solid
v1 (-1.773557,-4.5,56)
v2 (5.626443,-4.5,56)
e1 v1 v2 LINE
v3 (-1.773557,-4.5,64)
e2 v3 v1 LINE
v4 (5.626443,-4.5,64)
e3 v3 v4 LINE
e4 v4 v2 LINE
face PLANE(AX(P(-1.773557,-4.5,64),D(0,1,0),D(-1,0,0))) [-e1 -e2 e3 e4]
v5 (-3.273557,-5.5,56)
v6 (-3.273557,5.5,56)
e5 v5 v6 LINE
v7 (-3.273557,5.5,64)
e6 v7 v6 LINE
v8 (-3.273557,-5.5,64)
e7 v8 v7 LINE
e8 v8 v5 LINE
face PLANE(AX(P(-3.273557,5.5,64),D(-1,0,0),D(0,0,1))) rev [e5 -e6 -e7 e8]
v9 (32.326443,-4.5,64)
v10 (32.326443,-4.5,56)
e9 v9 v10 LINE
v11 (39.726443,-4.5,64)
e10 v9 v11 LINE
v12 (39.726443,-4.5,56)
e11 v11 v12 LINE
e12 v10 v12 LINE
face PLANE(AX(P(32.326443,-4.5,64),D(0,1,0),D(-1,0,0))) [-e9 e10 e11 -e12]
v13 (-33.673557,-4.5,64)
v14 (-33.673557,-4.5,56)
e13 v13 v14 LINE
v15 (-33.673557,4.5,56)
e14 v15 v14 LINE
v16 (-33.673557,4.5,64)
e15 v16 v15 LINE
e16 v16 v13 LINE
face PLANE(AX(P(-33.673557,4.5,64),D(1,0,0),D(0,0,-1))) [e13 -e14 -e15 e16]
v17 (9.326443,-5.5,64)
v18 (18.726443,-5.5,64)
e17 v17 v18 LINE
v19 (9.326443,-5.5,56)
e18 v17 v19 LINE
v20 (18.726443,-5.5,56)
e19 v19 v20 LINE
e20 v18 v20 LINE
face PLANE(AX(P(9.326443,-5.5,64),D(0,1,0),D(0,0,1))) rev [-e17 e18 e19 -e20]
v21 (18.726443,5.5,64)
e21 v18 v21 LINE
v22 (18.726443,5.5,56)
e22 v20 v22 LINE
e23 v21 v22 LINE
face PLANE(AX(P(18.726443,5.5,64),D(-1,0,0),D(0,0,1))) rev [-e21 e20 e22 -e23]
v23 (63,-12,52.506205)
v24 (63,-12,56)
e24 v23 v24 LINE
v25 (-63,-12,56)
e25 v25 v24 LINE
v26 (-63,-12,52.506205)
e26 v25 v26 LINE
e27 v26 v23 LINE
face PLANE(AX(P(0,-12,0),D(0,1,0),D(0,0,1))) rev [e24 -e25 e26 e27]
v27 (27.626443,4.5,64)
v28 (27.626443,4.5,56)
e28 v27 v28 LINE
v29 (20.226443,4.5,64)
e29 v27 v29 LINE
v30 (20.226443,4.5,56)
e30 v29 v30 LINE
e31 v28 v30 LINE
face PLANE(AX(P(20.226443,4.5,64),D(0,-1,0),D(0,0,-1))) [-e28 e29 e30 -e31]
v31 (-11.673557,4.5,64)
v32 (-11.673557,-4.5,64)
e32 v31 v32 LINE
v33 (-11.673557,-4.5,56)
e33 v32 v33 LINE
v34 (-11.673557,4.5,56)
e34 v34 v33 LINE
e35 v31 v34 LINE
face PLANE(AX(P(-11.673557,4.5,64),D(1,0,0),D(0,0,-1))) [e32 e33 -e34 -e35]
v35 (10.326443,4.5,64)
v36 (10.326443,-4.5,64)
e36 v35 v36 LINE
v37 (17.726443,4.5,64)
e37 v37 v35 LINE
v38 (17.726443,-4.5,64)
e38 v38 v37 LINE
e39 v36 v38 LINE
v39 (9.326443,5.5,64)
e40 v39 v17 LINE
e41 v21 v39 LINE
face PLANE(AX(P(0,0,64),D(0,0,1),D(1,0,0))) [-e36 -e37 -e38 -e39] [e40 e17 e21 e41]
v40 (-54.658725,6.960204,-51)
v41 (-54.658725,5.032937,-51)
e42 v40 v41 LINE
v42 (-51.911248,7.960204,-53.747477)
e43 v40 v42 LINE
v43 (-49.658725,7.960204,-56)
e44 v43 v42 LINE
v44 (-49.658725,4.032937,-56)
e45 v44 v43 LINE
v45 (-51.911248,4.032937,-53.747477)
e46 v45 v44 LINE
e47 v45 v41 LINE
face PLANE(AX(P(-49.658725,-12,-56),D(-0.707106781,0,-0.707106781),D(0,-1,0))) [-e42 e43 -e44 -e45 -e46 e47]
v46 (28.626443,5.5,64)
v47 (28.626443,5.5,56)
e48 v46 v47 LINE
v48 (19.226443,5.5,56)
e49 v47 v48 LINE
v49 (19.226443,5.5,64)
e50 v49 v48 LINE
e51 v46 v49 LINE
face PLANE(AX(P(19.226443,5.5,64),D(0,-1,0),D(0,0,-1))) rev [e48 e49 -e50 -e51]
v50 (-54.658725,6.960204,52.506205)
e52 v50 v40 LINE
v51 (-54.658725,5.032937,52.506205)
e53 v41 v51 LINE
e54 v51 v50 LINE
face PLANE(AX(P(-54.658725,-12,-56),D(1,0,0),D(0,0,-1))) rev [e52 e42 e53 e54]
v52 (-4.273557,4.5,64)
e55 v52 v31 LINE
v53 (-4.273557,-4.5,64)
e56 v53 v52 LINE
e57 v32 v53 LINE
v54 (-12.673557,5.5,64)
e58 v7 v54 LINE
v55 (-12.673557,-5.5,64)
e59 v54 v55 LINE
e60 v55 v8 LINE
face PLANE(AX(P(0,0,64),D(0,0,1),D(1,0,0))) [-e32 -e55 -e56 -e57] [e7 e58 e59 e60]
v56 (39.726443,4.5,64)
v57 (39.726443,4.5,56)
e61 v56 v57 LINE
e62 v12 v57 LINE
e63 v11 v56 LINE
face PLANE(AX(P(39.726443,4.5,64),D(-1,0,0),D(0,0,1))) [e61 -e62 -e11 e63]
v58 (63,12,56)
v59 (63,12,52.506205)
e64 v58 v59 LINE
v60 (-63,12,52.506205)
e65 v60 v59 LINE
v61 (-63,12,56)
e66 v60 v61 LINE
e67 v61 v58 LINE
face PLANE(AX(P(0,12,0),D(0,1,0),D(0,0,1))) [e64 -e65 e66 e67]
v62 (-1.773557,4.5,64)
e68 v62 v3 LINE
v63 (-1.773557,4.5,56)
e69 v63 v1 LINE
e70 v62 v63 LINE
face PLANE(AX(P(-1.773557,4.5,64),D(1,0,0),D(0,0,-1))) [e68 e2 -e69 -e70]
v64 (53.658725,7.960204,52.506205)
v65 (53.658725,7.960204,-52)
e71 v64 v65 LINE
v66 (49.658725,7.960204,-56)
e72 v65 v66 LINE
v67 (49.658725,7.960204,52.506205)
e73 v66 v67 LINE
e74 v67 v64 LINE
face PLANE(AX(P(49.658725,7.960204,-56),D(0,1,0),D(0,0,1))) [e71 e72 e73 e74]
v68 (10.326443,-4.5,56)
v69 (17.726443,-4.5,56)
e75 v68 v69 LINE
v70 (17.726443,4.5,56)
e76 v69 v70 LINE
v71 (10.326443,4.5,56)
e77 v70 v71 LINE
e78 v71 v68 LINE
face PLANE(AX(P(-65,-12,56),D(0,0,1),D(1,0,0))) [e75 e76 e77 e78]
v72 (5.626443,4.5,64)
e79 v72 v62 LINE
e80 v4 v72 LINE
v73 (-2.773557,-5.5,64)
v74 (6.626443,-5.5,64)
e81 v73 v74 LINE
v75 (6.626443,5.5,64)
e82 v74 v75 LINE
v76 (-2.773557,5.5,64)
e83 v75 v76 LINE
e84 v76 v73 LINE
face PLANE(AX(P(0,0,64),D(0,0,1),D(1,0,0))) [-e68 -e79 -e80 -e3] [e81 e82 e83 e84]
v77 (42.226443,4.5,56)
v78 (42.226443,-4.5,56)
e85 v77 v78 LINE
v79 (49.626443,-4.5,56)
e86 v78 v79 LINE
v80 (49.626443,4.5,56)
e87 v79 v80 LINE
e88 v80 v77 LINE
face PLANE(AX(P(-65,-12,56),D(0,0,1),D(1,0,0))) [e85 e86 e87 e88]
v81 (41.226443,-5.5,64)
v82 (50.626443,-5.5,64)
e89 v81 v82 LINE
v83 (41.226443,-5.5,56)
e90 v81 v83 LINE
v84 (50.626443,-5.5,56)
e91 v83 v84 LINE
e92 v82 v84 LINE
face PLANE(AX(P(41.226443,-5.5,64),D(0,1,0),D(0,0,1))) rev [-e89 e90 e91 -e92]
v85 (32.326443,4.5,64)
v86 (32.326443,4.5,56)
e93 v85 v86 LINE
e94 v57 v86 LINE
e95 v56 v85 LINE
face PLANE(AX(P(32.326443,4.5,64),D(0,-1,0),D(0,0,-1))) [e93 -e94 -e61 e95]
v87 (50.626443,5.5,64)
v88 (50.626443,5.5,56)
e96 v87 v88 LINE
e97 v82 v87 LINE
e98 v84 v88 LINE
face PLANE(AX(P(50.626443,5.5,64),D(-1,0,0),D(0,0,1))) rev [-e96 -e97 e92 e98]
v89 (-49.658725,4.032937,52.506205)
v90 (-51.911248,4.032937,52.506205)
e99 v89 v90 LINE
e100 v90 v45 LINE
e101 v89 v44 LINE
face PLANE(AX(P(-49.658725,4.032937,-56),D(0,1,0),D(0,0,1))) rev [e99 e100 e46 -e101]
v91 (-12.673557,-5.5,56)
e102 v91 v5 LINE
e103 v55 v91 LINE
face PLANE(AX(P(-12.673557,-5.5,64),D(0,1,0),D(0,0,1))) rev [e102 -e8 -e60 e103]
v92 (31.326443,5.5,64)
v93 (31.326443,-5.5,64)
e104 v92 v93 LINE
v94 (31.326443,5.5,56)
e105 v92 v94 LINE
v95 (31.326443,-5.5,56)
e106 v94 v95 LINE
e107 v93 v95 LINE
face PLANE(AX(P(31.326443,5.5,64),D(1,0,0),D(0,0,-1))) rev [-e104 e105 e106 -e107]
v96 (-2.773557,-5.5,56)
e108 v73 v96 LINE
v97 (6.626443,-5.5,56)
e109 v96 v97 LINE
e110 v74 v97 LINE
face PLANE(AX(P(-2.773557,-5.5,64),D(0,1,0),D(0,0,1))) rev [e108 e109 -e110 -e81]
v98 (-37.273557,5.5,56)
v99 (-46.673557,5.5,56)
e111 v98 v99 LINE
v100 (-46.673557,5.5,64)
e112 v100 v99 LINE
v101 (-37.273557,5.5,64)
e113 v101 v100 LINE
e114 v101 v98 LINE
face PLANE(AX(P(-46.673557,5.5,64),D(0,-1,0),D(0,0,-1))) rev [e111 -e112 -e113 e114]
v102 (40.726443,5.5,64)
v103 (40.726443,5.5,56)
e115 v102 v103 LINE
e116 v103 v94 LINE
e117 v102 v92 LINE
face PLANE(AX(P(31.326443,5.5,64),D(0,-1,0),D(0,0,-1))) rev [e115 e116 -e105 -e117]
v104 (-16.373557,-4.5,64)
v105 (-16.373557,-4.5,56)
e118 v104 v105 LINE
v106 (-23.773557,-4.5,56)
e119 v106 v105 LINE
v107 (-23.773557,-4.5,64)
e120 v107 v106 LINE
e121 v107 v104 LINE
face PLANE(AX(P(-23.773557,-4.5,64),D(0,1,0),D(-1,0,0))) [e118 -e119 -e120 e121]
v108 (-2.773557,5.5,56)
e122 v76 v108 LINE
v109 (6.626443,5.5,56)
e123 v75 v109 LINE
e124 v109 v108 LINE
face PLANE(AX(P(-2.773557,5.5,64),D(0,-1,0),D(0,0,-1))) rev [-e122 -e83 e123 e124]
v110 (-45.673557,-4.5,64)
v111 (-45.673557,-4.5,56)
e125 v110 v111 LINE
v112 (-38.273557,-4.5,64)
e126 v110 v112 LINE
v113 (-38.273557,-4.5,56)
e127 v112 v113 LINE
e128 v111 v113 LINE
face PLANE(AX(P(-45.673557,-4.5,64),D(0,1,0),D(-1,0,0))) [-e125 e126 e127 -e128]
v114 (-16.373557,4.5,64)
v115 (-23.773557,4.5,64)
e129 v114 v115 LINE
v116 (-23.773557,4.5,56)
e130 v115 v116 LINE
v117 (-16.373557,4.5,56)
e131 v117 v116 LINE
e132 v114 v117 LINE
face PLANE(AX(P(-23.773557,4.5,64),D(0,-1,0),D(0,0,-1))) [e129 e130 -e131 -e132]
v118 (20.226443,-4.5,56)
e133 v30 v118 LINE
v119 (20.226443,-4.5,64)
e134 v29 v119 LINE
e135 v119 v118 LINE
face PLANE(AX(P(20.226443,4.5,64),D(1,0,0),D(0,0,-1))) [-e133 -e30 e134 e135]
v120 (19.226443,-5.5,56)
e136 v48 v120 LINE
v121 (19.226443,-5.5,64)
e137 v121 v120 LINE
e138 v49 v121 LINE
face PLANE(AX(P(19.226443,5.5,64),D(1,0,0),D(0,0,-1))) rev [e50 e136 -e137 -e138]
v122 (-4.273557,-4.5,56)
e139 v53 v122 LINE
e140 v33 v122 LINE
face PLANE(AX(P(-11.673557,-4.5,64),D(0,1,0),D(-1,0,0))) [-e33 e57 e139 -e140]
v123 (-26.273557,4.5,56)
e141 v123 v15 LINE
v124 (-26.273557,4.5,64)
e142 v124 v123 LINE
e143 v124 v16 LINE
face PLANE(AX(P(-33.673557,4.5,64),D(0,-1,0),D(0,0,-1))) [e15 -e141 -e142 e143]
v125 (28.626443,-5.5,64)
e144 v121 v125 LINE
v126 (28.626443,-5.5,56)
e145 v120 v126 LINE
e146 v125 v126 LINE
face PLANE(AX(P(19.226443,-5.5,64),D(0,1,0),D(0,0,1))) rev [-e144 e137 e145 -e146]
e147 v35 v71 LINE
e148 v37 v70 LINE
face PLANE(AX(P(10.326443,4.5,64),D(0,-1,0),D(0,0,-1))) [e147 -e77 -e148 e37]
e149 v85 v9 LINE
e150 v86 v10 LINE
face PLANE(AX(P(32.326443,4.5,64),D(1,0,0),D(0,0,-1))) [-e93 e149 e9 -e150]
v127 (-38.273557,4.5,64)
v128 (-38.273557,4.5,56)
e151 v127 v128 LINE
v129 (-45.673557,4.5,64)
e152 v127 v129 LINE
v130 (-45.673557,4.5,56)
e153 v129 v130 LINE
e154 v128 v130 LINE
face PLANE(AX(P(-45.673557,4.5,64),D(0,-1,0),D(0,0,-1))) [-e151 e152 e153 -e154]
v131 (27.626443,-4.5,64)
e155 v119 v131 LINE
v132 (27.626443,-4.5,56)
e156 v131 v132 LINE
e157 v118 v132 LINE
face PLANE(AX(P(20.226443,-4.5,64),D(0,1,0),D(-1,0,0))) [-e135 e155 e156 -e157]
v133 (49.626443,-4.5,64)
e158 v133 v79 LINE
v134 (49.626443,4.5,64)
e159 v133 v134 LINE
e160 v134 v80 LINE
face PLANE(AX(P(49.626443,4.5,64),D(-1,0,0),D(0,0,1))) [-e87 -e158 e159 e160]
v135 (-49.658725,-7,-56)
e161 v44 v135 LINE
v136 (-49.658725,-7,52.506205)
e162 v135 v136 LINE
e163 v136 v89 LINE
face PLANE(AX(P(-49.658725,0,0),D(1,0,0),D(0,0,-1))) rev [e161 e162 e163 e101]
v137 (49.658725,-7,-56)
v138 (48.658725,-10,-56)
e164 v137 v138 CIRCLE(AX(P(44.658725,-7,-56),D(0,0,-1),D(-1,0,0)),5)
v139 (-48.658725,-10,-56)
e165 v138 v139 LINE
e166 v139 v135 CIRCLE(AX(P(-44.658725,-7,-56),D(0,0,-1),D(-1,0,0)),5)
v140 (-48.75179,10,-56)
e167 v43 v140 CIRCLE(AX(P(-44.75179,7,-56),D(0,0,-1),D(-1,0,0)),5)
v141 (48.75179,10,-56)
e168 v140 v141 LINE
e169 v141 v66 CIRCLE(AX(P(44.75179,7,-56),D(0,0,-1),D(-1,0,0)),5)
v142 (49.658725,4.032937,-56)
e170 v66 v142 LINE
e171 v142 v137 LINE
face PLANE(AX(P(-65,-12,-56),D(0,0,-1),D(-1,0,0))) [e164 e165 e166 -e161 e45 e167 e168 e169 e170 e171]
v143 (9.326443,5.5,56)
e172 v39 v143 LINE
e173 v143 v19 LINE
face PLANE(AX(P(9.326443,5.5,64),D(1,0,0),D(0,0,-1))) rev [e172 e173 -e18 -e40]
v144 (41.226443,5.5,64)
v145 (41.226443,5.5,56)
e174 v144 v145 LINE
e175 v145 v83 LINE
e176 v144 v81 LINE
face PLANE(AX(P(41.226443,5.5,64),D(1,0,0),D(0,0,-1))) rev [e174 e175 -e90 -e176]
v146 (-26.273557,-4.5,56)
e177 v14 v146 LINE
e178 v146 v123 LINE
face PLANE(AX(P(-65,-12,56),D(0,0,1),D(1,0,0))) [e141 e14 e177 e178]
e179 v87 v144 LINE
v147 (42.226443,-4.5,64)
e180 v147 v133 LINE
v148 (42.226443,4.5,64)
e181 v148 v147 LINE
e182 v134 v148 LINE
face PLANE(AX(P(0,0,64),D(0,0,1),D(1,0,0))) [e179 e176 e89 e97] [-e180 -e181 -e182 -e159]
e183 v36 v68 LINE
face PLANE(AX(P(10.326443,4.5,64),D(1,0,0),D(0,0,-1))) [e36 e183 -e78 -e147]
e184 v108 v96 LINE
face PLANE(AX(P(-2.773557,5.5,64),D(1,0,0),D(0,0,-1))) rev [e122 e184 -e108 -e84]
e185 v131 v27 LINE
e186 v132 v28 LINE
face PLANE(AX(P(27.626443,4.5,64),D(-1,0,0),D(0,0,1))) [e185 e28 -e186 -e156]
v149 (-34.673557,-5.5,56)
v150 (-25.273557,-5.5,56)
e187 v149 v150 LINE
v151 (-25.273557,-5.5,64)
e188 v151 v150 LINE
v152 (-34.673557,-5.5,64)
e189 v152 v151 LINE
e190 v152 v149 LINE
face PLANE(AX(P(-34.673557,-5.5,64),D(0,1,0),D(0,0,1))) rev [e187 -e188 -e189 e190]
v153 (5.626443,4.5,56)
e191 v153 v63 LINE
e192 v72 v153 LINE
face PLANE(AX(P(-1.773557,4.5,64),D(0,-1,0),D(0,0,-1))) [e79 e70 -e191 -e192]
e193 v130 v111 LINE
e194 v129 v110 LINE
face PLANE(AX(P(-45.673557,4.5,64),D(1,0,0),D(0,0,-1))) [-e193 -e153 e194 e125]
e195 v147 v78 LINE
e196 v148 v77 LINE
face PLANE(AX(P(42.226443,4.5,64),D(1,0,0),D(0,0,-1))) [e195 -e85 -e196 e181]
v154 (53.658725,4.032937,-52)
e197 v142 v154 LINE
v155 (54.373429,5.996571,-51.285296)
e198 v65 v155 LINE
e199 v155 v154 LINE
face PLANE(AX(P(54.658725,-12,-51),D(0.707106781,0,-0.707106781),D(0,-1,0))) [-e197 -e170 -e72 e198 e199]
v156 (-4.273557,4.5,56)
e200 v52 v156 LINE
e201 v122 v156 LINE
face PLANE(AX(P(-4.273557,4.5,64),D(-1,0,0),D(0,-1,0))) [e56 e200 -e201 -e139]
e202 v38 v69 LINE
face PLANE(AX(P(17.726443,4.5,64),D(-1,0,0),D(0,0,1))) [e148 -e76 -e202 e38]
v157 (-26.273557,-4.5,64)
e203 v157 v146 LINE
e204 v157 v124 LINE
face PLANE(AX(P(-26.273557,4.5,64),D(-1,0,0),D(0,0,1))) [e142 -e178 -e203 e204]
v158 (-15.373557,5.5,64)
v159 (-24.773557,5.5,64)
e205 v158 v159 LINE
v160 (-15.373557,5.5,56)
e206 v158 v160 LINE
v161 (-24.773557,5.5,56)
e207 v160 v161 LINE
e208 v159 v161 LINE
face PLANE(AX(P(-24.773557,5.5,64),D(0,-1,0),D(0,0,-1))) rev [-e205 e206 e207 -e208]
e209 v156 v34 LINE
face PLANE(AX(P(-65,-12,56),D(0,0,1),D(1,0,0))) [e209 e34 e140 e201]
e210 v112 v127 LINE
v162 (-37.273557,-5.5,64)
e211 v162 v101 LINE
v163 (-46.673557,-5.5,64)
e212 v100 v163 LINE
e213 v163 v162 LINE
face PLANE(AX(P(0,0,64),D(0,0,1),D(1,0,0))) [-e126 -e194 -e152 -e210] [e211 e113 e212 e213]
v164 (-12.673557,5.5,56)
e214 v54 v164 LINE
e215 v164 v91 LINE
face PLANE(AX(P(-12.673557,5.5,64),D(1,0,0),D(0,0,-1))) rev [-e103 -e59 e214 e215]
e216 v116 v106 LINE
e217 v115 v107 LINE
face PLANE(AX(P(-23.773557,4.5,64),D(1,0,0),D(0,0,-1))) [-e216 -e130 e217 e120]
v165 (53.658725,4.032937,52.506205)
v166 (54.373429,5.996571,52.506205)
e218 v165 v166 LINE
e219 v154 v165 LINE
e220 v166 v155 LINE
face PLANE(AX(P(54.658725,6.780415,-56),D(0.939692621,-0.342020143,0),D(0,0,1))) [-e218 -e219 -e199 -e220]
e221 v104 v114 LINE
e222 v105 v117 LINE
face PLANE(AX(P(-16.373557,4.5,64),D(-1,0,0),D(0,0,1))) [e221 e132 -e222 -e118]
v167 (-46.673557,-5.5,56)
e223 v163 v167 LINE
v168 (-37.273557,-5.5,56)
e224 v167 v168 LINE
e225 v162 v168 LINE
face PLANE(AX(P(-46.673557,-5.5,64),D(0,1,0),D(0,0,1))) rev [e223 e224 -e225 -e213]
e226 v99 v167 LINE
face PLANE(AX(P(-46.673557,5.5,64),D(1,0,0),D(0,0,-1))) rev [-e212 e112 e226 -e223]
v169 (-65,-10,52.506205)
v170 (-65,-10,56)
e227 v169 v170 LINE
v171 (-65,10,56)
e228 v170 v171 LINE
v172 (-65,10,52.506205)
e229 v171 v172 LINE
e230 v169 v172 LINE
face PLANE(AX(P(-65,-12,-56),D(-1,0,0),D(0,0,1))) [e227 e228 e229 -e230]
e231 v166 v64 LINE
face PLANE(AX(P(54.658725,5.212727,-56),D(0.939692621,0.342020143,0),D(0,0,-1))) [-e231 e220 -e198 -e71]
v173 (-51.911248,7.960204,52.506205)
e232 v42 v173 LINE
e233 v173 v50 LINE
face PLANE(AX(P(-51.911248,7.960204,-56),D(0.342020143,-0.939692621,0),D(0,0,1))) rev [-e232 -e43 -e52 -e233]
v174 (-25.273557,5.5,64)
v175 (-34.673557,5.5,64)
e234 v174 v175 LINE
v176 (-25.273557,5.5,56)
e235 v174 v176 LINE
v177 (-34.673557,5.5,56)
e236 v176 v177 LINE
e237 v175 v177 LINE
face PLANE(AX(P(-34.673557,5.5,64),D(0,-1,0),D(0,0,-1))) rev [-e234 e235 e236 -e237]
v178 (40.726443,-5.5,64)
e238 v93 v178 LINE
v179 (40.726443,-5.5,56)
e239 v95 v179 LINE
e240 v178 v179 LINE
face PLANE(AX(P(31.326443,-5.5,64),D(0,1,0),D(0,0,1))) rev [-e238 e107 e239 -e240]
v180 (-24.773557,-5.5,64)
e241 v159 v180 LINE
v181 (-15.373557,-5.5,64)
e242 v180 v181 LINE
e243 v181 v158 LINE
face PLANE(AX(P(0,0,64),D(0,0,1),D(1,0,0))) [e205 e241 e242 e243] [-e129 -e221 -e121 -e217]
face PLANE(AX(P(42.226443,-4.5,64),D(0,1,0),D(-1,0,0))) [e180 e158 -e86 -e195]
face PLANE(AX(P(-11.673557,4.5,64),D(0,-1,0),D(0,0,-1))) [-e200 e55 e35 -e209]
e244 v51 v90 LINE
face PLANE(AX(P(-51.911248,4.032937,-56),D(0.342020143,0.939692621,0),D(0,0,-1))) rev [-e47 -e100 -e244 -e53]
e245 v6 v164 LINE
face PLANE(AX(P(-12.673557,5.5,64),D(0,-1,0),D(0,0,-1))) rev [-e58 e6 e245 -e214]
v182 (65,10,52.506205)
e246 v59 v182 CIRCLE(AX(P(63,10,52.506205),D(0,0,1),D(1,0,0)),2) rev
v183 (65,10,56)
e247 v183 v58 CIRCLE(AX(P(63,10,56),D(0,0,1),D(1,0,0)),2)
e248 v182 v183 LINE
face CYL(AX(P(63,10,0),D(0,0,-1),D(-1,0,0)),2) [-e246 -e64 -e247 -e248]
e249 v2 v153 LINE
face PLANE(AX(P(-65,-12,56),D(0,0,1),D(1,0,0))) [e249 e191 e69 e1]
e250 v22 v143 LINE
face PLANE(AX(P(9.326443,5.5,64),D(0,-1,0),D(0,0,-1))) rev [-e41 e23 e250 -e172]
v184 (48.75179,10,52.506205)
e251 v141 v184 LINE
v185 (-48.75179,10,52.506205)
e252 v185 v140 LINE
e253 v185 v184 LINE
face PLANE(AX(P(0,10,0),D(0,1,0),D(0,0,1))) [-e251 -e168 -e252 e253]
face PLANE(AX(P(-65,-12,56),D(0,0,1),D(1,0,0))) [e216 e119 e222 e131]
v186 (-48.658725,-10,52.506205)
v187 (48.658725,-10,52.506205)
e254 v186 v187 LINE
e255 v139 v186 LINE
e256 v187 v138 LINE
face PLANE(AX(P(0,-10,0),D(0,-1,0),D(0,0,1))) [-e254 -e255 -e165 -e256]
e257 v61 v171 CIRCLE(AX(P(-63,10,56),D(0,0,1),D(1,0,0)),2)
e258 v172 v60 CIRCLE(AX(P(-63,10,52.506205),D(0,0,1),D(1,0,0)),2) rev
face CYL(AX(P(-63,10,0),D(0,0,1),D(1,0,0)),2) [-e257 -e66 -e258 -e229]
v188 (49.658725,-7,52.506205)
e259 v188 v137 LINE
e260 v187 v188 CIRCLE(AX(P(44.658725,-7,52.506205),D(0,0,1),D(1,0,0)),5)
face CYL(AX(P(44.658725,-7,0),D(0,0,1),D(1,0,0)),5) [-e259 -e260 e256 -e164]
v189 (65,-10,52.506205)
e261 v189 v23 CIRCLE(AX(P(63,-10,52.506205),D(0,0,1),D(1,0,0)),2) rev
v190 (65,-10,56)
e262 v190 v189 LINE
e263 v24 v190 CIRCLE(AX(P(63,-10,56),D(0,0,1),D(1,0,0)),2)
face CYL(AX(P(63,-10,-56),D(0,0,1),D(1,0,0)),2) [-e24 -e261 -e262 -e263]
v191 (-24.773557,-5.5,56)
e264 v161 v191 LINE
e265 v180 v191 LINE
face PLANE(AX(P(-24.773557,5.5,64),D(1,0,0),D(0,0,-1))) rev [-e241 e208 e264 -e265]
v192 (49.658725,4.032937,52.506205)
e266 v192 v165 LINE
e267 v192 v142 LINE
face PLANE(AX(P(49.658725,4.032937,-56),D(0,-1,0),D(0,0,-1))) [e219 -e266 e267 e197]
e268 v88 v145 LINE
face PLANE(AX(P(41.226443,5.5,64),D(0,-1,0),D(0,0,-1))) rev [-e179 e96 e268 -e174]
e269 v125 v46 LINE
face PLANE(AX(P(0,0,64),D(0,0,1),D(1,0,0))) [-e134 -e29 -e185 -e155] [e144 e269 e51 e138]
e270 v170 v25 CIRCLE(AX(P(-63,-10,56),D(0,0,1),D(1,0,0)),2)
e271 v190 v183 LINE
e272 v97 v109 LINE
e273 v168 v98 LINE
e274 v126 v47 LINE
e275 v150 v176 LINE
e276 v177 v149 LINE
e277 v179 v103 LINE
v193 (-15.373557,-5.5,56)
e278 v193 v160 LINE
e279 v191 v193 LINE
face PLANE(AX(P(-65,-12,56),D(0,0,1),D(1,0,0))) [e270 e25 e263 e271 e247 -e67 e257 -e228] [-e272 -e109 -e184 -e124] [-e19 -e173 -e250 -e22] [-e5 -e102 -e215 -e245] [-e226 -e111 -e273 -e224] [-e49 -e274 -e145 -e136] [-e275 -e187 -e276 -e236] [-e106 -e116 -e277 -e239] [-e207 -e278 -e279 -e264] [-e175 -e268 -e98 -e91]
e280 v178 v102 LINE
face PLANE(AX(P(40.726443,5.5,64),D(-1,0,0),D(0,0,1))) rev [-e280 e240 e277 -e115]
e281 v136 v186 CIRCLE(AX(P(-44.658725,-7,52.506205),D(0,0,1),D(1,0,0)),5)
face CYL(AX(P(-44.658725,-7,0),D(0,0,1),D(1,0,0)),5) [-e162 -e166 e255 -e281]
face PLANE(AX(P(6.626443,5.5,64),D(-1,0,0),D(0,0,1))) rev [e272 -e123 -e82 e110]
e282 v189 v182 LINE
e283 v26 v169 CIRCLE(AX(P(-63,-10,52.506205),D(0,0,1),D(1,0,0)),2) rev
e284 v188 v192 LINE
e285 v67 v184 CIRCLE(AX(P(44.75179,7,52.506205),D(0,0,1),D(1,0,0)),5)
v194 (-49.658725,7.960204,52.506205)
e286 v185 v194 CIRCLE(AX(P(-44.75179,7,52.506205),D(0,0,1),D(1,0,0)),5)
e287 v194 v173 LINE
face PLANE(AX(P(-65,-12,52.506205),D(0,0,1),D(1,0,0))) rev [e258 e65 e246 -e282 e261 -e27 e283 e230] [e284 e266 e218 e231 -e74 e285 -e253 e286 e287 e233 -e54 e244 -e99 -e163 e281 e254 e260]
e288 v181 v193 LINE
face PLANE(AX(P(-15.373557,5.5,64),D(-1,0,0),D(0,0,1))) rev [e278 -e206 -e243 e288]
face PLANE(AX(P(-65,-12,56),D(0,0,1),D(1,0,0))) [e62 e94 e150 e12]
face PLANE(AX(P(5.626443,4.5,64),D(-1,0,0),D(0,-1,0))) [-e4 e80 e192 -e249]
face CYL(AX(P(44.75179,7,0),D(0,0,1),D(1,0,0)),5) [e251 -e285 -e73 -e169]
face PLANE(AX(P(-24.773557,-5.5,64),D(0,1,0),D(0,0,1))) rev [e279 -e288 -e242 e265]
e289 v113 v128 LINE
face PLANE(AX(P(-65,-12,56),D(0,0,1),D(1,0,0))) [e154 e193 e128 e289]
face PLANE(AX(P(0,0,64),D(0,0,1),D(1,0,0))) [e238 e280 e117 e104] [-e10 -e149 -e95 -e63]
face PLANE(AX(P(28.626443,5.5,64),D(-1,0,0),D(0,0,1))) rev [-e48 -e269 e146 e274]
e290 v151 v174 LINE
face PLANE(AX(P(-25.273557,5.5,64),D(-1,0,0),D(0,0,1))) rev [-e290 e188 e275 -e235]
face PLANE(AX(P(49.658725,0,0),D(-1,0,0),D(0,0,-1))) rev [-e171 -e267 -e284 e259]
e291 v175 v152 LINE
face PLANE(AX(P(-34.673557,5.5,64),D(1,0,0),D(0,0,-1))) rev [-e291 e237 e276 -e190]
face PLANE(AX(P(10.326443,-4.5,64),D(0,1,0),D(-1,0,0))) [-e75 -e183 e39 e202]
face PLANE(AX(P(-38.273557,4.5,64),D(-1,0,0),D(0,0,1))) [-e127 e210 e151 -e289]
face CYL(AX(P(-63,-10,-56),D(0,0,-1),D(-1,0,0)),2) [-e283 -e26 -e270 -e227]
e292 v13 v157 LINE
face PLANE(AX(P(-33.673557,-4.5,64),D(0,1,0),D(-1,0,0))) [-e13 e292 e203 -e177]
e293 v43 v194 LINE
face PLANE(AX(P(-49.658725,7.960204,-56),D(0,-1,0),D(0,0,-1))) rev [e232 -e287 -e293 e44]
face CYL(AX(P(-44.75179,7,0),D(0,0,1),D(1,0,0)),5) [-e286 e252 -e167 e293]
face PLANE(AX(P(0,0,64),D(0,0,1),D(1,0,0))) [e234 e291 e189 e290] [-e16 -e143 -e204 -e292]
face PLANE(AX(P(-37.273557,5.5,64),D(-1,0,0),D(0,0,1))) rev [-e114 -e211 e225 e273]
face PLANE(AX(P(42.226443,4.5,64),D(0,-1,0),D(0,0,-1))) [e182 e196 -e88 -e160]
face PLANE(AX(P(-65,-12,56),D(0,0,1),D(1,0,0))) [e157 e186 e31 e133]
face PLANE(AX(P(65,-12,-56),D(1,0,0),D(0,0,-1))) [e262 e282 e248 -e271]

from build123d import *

# Parameters (mm, degrees)
EXTRUDE_1_DEPTH      = 12
EXTRUDE_1_DEPTH_BACK = 12
SKETCH_1_W           = 130
SKETCH_1_H           = 112
SKETCH_2_W           = 10.341275007
SKETCH_2_H           = 108.506204724
CUT_EXTRUDE_1_DEPTH  = 90.089842294
SKETCH_3_W           = 108.506204724
SKETCH_3_H           = 4.039795579
SKETCH_3_H_2         = 16.032937215
CUT_EXTRUDE_2_DEPTH  = 5
CHAMFER_1_SIZE       = 5
FILLET_1_R           = 5
CHAMFER_2_SIZE       = 2.747477419
CHAMFER_2_SIZE_2     = 1
FILLET_2_R           = 2
SKETCH_4_W           = 9.4
SKETCH_4_H           = 11
SKETCH_4_W_2         = 7.4
SKETCH_4_H_2         = 9
EXTRUDE_2_DEPTH      = 8
SKETCH_5_W           = 122.805441914
SKETCH_5_H           = 111.758877205
CUT_EXTRUDE_3_DEPTH  = 2


with BuildPart() as part:
    # 草图1 → 凸台-拉伸1 (new, two sides: drawn at the far end of the back side and taken through both)
    with BuildSketch(Plane(origin=(0, 0, 0), x_dir=(1, 0, 0), z_dir=(0, 1, 0)).offset(-EXTRUDE_1_DEPTH_BACK)):
        Rectangle(SKETCH_1_W, SKETCH_1_H)
    extrude(amount=EXTRUDE_1_DEPTH + EXTRUDE_1_DEPTH_BACK)

    # 草图2 → 切除-拉伸1 (cut, through all)
    with BuildSketch(Plane(origin=(0, 12, 0), x_dir=(1, 0, 0), z_dir=(0, 1, 0))):
        with Locations((59.829362496, 1.746897638)):
            Rectangle(SKETCH_2_W, SKETCH_2_H)
        with Locations((-59.829362496, 1.746897638)):
            Rectangle(SKETCH_2_W, SKETCH_2_H)
    extrude(amount=-CUT_EXTRUDE_1_DEPTH, mode=Mode.SUBTRACT)

    # 草图3 → 切除-拉伸2 (cut)
    with BuildSketch(Plane.ZY.offset(54.658724993)):
        with Locations((-1.746897638, 9.980102211)):
            Rectangle(SKETCH_3_W, SKETCH_3_H)
        with Locations((-1.746897638, -3.983531392)):
            Rectangle(SKETCH_3_W, SKETCH_3_H_2)
    cut_extrude_2 = extrude(amount=-CUT_EXTRUDE_2_DEPTH, mode=Mode.SUBTRACT)

    # 镜向1: 切除-拉伸2 across plane
    add(cut_extrude_2.mirror(Plane(origin=(0, 0, 0), x_dir=(0, 0, 1), z_dir=(1, 0, 0))), mode=Mode.SUBTRACT)

    # 倒角1
    chamfer_1_edges = [part.edges().sort_by_distance(p)[0] for p in [
        (-54.658724993, 5.996570818, -56),
        (54.658724993, 5.996570818, -56),
    ]]
    chamfer(chamfer_1_edges, length=CHAMFER_1_SIZE)

    # 圆角1
    # the kernel refuses this fillet: 5 mm, written as the material it takes off along each edge
    with BuildSketch(Plane(origin=(-49.658724993, 12, -68.267336577), x_dir=(0, -1, 0), z_dir=(0, 0, 1))) as fillet_1_piece_1:
        with BuildLine():
            CenterArc((5, 4.906934631), FILLET_1_R, 180, 78.928088112)
            Line((0, 4.906934631), (0, 0))
            Line((0, 0), (4.039795579, 0))
        make_face()
    extrude(amount=120.773541301, mode=Mode.SUBTRACT)
    with BuildSketch(Plane(origin=(-49.658724993, -12, -68.5), x_dir=(0, 1, 0), z_dir=(0, 0, 1)), Plane(origin=(49.658724993, -12, -68.5), x_dir=(-1, 0, 0), z_dir=(0, 0, 1))) as fillet_1_piece_2:
        with BuildLine():
            CenterArc((FILLET_1_R, -FILLET_1_R), FILLET_1_R, 90, 90)
            Line((0, -FILLET_1_R), (0, 0))
            Line((0, 0), (FILLET_1_R, 0))
        make_face()
    extrude(amount=121.006204724, mode=Mode.SUBTRACT)
    with BuildSketch(Plane(origin=(49.658724993, 12, -68.267336577), x_dir=(-1, 0, 0), z_dir=(0, 0, 1))) as fillet_1_piece_3:
        with BuildLine():
            CenterArc((4.906934631, 5), FILLET_1_R, 191.071911888, 78.928088112)
            Line((0, 4.039795579), (0, 0))
            Line((0, 0), (4.906934631, 0))
        make_face()
    extrude(amount=120.773541301, mode=Mode.SUBTRACT)

    # 倒角2
    # the kernel refuses this chamfer: 2.747477419, 1 mm, written as the material it takes off along each edge
    with BuildSketch(Plane(origin=(54.658724993, 7.960204421, 52.506204724), x_dir=(0.013184058198646324, -0.9999130865277316, 0), z_dir=(0, 0, -1))) as chamfer_2_piece_1:
        Polygon((CHAMFER_2_SIZE * 0.999913086693, CHAMFER_2_SIZE * 0.0131840582008), (-CHAMFER_2_SIZE_2 * 0.0131840581986, CHAMFER_2_SIZE_2 * 0.999913086528), (0, 0), align=None)
    extrude(amount=110.633696174, mode=Mode.SUBTRACT)
    with BuildSketch(Plane(origin=(54.658724993, 4.032937215, 52.506204724), x_dir=(-0.9950833631817486, -0.09904090225205064, 0), z_dir=(0, 0, -1))) as chamfer_2_piece_2:
        Polygon((CHAMFER_2_SIZE_2 * 0.995083363182, CHAMFER_2_SIZE_2 * 0.0990409022521), (-CHAMFER_2_SIZE * 0.0990409022684, CHAMFER_2_SIZE * 0.995083363346), (0, 0), align=None)
    extrude(amount=110.633696174, mode=Mode.SUBTRACT)
    with BuildSketch(Plane(origin=(-54.658724993, 4.032937215, 52.506204724), x_dir=(0.9999130865277316, -0.013184058198645857, 0), z_dir=(0, 0, -1))) as chamfer_2_piece_3:
        Polygon((CHAMFER_2_SIZE * 0.999913086693, -CHAMFER_2_SIZE * 0.0131840582008), (-CHAMFER_2_SIZE_2 * 0.0131840581986, -CHAMFER_2_SIZE_2 * 0.999913086528), (0, 0), align=None)
    extrude(amount=110.633696174, mode=Mode.SUBTRACT)
    with BuildSketch(Plane(origin=(-54.658724993, 7.960204421, 52.506204724), x_dir=(-0.09904090225204956, -0.9950833631817488, 0), z_dir=(0, 0, -1))) as chamfer_2_piece_4:
        Polygon((CHAMFER_2_SIZE_2 * 0.995083363182, -CHAMFER_2_SIZE_2 * 0.099040902252), (-CHAMFER_2_SIZE * 0.0990409022684, -CHAMFER_2_SIZE * 0.995083363346), (0, 0), align=None)
    extrude(amount=110.633696174, mode=Mode.SUBTRACT)

    # 圆角2
    fillet_2_edges = [part.edges().sort_by_distance(p)[0] for p in [
        (65, -12, 54.253102362),
        (65, 12, 54.253102362),
        (-65, 12, 54.253102362),
        (-65, -12, 54.253102362),
    ]]
    fillet(fillet_2_edges, radius=FILLET_2_R)

    # 草图4 → 凸台-拉伸2 (add)
    # profile 1 of 9: a face of its own
    with BuildSketch(Plane.XY.offset(56)):
        with Locations((-29.973556768, 0)):
            Rectangle(SKETCH_4_W, SKETCH_4_H)
        with Locations((-29.973556768, 0)):
            Rectangle(SKETCH_4_W_2, SKETCH_4_H_2, mode=Mode.SUBTRACT)
    # profile 2 of 9: a face of its own
    with BuildSketch(Plane.XY.offset(56)):
        with Locations((-41.973556768, 0)):
            Rectangle(SKETCH_4_W, SKETCH_4_H)
        with Locations((-41.973556768, 0)):
            Rectangle(SKETCH_4_W_2, SKETCH_4_H_2, mode=Mode.SUBTRACT)
    # profile 3 of 9: a face of its own
    with BuildSketch(Plane.XY.offset(56)):
        with Locations((-20.073556768, 0)):
            Rectangle(SKETCH_4_W, SKETCH_4_H)
        with Locations((-20.073556768, 0)):
            Rectangle(SKETCH_4_W_2, SKETCH_4_H_2, mode=Mode.SUBTRACT)
    # profile 4 of 9: a face of its own
    with BuildSketch(Plane.XY.offset(56)):
        with Locations((-7.973556768, 0)):
            Rectangle(SKETCH_4_W, SKETCH_4_H)
        with Locations((-7.973556768, 0)):
            Rectangle(SKETCH_4_W_2, SKETCH_4_H_2, mode=Mode.SUBTRACT)
    # profile 5 of 9: a face of its own
    with BuildSketch(Plane.XY.offset(56)):
        with Locations((1.926443232, 0)):
            Rectangle(SKETCH_4_W, SKETCH_4_H)
        with Locations((1.926443232, 0)):
            Rectangle(SKETCH_4_W_2, SKETCH_4_H_2, mode=Mode.SUBTRACT)
    # profile 6 of 9: a face of its own
    with BuildSketch(Plane.XY.offset(56)):
        with Locations((14.026443232, 0)):
            Rectangle(SKETCH_4_W, SKETCH_4_H)
        with Locations((14.026443232, 0)):
            Rectangle(SKETCH_4_W_2, SKETCH_4_H_2, mode=Mode.SUBTRACT)
    # profile 7 of 9: a face of its own
    with BuildSketch(Plane.XY.offset(56)):
        with Locations((23.926443232, 0)):
            Rectangle(SKETCH_4_W, SKETCH_4_H)
        with Locations((23.926443232, 0)):
            Rectangle(SKETCH_4_W_2, SKETCH_4_H_2, mode=Mode.SUBTRACT)
    # profile 8 of 9: a face of its own
    with BuildSketch(Plane.XY.offset(56)):
        with Locations((36.026443232, 0)):
            Rectangle(SKETCH_4_W, SKETCH_4_H)
        with Locations((36.026443232, 0)):
            Rectangle(SKETCH_4_W_2, SKETCH_4_H_2, mode=Mode.SUBTRACT)
    # profile 9 of 9: a face of its own
    with BuildSketch(Plane.XY.offset(56)):
        with Locations((45.926443232, 0)):
            Rectangle(SKETCH_4_W, SKETCH_4_H)
        with Locations((45.926443232, 0)):
            Rectangle(SKETCH_4_W_2, SKETCH_4_H_2, mode=Mode.SUBTRACT)
    extrude(amount=EXTRUDE_2_DEPTH)

    # 草图5 → 切除-拉伸3 (cut)
    with BuildSketch(Plane(origin=(0, 12, 0), x_dir=(1, 0, 0), z_dir=(0, 1, 0))):
        with Locations((1.597279043, 3.373233879)):
            Rectangle(SKETCH_5_W, SKETCH_5_H)
    cut_extrude_3 = extrude(amount=-CUT_EXTRUDE_3_DEPTH, mode=Mode.SUBTRACT)

    # 镜向2: 切除-拉伸3 across plane
    add(cut_extrude_3.mirror(Plane.ZX), mode=Mode.SUBTRACT)


solid = part.part
